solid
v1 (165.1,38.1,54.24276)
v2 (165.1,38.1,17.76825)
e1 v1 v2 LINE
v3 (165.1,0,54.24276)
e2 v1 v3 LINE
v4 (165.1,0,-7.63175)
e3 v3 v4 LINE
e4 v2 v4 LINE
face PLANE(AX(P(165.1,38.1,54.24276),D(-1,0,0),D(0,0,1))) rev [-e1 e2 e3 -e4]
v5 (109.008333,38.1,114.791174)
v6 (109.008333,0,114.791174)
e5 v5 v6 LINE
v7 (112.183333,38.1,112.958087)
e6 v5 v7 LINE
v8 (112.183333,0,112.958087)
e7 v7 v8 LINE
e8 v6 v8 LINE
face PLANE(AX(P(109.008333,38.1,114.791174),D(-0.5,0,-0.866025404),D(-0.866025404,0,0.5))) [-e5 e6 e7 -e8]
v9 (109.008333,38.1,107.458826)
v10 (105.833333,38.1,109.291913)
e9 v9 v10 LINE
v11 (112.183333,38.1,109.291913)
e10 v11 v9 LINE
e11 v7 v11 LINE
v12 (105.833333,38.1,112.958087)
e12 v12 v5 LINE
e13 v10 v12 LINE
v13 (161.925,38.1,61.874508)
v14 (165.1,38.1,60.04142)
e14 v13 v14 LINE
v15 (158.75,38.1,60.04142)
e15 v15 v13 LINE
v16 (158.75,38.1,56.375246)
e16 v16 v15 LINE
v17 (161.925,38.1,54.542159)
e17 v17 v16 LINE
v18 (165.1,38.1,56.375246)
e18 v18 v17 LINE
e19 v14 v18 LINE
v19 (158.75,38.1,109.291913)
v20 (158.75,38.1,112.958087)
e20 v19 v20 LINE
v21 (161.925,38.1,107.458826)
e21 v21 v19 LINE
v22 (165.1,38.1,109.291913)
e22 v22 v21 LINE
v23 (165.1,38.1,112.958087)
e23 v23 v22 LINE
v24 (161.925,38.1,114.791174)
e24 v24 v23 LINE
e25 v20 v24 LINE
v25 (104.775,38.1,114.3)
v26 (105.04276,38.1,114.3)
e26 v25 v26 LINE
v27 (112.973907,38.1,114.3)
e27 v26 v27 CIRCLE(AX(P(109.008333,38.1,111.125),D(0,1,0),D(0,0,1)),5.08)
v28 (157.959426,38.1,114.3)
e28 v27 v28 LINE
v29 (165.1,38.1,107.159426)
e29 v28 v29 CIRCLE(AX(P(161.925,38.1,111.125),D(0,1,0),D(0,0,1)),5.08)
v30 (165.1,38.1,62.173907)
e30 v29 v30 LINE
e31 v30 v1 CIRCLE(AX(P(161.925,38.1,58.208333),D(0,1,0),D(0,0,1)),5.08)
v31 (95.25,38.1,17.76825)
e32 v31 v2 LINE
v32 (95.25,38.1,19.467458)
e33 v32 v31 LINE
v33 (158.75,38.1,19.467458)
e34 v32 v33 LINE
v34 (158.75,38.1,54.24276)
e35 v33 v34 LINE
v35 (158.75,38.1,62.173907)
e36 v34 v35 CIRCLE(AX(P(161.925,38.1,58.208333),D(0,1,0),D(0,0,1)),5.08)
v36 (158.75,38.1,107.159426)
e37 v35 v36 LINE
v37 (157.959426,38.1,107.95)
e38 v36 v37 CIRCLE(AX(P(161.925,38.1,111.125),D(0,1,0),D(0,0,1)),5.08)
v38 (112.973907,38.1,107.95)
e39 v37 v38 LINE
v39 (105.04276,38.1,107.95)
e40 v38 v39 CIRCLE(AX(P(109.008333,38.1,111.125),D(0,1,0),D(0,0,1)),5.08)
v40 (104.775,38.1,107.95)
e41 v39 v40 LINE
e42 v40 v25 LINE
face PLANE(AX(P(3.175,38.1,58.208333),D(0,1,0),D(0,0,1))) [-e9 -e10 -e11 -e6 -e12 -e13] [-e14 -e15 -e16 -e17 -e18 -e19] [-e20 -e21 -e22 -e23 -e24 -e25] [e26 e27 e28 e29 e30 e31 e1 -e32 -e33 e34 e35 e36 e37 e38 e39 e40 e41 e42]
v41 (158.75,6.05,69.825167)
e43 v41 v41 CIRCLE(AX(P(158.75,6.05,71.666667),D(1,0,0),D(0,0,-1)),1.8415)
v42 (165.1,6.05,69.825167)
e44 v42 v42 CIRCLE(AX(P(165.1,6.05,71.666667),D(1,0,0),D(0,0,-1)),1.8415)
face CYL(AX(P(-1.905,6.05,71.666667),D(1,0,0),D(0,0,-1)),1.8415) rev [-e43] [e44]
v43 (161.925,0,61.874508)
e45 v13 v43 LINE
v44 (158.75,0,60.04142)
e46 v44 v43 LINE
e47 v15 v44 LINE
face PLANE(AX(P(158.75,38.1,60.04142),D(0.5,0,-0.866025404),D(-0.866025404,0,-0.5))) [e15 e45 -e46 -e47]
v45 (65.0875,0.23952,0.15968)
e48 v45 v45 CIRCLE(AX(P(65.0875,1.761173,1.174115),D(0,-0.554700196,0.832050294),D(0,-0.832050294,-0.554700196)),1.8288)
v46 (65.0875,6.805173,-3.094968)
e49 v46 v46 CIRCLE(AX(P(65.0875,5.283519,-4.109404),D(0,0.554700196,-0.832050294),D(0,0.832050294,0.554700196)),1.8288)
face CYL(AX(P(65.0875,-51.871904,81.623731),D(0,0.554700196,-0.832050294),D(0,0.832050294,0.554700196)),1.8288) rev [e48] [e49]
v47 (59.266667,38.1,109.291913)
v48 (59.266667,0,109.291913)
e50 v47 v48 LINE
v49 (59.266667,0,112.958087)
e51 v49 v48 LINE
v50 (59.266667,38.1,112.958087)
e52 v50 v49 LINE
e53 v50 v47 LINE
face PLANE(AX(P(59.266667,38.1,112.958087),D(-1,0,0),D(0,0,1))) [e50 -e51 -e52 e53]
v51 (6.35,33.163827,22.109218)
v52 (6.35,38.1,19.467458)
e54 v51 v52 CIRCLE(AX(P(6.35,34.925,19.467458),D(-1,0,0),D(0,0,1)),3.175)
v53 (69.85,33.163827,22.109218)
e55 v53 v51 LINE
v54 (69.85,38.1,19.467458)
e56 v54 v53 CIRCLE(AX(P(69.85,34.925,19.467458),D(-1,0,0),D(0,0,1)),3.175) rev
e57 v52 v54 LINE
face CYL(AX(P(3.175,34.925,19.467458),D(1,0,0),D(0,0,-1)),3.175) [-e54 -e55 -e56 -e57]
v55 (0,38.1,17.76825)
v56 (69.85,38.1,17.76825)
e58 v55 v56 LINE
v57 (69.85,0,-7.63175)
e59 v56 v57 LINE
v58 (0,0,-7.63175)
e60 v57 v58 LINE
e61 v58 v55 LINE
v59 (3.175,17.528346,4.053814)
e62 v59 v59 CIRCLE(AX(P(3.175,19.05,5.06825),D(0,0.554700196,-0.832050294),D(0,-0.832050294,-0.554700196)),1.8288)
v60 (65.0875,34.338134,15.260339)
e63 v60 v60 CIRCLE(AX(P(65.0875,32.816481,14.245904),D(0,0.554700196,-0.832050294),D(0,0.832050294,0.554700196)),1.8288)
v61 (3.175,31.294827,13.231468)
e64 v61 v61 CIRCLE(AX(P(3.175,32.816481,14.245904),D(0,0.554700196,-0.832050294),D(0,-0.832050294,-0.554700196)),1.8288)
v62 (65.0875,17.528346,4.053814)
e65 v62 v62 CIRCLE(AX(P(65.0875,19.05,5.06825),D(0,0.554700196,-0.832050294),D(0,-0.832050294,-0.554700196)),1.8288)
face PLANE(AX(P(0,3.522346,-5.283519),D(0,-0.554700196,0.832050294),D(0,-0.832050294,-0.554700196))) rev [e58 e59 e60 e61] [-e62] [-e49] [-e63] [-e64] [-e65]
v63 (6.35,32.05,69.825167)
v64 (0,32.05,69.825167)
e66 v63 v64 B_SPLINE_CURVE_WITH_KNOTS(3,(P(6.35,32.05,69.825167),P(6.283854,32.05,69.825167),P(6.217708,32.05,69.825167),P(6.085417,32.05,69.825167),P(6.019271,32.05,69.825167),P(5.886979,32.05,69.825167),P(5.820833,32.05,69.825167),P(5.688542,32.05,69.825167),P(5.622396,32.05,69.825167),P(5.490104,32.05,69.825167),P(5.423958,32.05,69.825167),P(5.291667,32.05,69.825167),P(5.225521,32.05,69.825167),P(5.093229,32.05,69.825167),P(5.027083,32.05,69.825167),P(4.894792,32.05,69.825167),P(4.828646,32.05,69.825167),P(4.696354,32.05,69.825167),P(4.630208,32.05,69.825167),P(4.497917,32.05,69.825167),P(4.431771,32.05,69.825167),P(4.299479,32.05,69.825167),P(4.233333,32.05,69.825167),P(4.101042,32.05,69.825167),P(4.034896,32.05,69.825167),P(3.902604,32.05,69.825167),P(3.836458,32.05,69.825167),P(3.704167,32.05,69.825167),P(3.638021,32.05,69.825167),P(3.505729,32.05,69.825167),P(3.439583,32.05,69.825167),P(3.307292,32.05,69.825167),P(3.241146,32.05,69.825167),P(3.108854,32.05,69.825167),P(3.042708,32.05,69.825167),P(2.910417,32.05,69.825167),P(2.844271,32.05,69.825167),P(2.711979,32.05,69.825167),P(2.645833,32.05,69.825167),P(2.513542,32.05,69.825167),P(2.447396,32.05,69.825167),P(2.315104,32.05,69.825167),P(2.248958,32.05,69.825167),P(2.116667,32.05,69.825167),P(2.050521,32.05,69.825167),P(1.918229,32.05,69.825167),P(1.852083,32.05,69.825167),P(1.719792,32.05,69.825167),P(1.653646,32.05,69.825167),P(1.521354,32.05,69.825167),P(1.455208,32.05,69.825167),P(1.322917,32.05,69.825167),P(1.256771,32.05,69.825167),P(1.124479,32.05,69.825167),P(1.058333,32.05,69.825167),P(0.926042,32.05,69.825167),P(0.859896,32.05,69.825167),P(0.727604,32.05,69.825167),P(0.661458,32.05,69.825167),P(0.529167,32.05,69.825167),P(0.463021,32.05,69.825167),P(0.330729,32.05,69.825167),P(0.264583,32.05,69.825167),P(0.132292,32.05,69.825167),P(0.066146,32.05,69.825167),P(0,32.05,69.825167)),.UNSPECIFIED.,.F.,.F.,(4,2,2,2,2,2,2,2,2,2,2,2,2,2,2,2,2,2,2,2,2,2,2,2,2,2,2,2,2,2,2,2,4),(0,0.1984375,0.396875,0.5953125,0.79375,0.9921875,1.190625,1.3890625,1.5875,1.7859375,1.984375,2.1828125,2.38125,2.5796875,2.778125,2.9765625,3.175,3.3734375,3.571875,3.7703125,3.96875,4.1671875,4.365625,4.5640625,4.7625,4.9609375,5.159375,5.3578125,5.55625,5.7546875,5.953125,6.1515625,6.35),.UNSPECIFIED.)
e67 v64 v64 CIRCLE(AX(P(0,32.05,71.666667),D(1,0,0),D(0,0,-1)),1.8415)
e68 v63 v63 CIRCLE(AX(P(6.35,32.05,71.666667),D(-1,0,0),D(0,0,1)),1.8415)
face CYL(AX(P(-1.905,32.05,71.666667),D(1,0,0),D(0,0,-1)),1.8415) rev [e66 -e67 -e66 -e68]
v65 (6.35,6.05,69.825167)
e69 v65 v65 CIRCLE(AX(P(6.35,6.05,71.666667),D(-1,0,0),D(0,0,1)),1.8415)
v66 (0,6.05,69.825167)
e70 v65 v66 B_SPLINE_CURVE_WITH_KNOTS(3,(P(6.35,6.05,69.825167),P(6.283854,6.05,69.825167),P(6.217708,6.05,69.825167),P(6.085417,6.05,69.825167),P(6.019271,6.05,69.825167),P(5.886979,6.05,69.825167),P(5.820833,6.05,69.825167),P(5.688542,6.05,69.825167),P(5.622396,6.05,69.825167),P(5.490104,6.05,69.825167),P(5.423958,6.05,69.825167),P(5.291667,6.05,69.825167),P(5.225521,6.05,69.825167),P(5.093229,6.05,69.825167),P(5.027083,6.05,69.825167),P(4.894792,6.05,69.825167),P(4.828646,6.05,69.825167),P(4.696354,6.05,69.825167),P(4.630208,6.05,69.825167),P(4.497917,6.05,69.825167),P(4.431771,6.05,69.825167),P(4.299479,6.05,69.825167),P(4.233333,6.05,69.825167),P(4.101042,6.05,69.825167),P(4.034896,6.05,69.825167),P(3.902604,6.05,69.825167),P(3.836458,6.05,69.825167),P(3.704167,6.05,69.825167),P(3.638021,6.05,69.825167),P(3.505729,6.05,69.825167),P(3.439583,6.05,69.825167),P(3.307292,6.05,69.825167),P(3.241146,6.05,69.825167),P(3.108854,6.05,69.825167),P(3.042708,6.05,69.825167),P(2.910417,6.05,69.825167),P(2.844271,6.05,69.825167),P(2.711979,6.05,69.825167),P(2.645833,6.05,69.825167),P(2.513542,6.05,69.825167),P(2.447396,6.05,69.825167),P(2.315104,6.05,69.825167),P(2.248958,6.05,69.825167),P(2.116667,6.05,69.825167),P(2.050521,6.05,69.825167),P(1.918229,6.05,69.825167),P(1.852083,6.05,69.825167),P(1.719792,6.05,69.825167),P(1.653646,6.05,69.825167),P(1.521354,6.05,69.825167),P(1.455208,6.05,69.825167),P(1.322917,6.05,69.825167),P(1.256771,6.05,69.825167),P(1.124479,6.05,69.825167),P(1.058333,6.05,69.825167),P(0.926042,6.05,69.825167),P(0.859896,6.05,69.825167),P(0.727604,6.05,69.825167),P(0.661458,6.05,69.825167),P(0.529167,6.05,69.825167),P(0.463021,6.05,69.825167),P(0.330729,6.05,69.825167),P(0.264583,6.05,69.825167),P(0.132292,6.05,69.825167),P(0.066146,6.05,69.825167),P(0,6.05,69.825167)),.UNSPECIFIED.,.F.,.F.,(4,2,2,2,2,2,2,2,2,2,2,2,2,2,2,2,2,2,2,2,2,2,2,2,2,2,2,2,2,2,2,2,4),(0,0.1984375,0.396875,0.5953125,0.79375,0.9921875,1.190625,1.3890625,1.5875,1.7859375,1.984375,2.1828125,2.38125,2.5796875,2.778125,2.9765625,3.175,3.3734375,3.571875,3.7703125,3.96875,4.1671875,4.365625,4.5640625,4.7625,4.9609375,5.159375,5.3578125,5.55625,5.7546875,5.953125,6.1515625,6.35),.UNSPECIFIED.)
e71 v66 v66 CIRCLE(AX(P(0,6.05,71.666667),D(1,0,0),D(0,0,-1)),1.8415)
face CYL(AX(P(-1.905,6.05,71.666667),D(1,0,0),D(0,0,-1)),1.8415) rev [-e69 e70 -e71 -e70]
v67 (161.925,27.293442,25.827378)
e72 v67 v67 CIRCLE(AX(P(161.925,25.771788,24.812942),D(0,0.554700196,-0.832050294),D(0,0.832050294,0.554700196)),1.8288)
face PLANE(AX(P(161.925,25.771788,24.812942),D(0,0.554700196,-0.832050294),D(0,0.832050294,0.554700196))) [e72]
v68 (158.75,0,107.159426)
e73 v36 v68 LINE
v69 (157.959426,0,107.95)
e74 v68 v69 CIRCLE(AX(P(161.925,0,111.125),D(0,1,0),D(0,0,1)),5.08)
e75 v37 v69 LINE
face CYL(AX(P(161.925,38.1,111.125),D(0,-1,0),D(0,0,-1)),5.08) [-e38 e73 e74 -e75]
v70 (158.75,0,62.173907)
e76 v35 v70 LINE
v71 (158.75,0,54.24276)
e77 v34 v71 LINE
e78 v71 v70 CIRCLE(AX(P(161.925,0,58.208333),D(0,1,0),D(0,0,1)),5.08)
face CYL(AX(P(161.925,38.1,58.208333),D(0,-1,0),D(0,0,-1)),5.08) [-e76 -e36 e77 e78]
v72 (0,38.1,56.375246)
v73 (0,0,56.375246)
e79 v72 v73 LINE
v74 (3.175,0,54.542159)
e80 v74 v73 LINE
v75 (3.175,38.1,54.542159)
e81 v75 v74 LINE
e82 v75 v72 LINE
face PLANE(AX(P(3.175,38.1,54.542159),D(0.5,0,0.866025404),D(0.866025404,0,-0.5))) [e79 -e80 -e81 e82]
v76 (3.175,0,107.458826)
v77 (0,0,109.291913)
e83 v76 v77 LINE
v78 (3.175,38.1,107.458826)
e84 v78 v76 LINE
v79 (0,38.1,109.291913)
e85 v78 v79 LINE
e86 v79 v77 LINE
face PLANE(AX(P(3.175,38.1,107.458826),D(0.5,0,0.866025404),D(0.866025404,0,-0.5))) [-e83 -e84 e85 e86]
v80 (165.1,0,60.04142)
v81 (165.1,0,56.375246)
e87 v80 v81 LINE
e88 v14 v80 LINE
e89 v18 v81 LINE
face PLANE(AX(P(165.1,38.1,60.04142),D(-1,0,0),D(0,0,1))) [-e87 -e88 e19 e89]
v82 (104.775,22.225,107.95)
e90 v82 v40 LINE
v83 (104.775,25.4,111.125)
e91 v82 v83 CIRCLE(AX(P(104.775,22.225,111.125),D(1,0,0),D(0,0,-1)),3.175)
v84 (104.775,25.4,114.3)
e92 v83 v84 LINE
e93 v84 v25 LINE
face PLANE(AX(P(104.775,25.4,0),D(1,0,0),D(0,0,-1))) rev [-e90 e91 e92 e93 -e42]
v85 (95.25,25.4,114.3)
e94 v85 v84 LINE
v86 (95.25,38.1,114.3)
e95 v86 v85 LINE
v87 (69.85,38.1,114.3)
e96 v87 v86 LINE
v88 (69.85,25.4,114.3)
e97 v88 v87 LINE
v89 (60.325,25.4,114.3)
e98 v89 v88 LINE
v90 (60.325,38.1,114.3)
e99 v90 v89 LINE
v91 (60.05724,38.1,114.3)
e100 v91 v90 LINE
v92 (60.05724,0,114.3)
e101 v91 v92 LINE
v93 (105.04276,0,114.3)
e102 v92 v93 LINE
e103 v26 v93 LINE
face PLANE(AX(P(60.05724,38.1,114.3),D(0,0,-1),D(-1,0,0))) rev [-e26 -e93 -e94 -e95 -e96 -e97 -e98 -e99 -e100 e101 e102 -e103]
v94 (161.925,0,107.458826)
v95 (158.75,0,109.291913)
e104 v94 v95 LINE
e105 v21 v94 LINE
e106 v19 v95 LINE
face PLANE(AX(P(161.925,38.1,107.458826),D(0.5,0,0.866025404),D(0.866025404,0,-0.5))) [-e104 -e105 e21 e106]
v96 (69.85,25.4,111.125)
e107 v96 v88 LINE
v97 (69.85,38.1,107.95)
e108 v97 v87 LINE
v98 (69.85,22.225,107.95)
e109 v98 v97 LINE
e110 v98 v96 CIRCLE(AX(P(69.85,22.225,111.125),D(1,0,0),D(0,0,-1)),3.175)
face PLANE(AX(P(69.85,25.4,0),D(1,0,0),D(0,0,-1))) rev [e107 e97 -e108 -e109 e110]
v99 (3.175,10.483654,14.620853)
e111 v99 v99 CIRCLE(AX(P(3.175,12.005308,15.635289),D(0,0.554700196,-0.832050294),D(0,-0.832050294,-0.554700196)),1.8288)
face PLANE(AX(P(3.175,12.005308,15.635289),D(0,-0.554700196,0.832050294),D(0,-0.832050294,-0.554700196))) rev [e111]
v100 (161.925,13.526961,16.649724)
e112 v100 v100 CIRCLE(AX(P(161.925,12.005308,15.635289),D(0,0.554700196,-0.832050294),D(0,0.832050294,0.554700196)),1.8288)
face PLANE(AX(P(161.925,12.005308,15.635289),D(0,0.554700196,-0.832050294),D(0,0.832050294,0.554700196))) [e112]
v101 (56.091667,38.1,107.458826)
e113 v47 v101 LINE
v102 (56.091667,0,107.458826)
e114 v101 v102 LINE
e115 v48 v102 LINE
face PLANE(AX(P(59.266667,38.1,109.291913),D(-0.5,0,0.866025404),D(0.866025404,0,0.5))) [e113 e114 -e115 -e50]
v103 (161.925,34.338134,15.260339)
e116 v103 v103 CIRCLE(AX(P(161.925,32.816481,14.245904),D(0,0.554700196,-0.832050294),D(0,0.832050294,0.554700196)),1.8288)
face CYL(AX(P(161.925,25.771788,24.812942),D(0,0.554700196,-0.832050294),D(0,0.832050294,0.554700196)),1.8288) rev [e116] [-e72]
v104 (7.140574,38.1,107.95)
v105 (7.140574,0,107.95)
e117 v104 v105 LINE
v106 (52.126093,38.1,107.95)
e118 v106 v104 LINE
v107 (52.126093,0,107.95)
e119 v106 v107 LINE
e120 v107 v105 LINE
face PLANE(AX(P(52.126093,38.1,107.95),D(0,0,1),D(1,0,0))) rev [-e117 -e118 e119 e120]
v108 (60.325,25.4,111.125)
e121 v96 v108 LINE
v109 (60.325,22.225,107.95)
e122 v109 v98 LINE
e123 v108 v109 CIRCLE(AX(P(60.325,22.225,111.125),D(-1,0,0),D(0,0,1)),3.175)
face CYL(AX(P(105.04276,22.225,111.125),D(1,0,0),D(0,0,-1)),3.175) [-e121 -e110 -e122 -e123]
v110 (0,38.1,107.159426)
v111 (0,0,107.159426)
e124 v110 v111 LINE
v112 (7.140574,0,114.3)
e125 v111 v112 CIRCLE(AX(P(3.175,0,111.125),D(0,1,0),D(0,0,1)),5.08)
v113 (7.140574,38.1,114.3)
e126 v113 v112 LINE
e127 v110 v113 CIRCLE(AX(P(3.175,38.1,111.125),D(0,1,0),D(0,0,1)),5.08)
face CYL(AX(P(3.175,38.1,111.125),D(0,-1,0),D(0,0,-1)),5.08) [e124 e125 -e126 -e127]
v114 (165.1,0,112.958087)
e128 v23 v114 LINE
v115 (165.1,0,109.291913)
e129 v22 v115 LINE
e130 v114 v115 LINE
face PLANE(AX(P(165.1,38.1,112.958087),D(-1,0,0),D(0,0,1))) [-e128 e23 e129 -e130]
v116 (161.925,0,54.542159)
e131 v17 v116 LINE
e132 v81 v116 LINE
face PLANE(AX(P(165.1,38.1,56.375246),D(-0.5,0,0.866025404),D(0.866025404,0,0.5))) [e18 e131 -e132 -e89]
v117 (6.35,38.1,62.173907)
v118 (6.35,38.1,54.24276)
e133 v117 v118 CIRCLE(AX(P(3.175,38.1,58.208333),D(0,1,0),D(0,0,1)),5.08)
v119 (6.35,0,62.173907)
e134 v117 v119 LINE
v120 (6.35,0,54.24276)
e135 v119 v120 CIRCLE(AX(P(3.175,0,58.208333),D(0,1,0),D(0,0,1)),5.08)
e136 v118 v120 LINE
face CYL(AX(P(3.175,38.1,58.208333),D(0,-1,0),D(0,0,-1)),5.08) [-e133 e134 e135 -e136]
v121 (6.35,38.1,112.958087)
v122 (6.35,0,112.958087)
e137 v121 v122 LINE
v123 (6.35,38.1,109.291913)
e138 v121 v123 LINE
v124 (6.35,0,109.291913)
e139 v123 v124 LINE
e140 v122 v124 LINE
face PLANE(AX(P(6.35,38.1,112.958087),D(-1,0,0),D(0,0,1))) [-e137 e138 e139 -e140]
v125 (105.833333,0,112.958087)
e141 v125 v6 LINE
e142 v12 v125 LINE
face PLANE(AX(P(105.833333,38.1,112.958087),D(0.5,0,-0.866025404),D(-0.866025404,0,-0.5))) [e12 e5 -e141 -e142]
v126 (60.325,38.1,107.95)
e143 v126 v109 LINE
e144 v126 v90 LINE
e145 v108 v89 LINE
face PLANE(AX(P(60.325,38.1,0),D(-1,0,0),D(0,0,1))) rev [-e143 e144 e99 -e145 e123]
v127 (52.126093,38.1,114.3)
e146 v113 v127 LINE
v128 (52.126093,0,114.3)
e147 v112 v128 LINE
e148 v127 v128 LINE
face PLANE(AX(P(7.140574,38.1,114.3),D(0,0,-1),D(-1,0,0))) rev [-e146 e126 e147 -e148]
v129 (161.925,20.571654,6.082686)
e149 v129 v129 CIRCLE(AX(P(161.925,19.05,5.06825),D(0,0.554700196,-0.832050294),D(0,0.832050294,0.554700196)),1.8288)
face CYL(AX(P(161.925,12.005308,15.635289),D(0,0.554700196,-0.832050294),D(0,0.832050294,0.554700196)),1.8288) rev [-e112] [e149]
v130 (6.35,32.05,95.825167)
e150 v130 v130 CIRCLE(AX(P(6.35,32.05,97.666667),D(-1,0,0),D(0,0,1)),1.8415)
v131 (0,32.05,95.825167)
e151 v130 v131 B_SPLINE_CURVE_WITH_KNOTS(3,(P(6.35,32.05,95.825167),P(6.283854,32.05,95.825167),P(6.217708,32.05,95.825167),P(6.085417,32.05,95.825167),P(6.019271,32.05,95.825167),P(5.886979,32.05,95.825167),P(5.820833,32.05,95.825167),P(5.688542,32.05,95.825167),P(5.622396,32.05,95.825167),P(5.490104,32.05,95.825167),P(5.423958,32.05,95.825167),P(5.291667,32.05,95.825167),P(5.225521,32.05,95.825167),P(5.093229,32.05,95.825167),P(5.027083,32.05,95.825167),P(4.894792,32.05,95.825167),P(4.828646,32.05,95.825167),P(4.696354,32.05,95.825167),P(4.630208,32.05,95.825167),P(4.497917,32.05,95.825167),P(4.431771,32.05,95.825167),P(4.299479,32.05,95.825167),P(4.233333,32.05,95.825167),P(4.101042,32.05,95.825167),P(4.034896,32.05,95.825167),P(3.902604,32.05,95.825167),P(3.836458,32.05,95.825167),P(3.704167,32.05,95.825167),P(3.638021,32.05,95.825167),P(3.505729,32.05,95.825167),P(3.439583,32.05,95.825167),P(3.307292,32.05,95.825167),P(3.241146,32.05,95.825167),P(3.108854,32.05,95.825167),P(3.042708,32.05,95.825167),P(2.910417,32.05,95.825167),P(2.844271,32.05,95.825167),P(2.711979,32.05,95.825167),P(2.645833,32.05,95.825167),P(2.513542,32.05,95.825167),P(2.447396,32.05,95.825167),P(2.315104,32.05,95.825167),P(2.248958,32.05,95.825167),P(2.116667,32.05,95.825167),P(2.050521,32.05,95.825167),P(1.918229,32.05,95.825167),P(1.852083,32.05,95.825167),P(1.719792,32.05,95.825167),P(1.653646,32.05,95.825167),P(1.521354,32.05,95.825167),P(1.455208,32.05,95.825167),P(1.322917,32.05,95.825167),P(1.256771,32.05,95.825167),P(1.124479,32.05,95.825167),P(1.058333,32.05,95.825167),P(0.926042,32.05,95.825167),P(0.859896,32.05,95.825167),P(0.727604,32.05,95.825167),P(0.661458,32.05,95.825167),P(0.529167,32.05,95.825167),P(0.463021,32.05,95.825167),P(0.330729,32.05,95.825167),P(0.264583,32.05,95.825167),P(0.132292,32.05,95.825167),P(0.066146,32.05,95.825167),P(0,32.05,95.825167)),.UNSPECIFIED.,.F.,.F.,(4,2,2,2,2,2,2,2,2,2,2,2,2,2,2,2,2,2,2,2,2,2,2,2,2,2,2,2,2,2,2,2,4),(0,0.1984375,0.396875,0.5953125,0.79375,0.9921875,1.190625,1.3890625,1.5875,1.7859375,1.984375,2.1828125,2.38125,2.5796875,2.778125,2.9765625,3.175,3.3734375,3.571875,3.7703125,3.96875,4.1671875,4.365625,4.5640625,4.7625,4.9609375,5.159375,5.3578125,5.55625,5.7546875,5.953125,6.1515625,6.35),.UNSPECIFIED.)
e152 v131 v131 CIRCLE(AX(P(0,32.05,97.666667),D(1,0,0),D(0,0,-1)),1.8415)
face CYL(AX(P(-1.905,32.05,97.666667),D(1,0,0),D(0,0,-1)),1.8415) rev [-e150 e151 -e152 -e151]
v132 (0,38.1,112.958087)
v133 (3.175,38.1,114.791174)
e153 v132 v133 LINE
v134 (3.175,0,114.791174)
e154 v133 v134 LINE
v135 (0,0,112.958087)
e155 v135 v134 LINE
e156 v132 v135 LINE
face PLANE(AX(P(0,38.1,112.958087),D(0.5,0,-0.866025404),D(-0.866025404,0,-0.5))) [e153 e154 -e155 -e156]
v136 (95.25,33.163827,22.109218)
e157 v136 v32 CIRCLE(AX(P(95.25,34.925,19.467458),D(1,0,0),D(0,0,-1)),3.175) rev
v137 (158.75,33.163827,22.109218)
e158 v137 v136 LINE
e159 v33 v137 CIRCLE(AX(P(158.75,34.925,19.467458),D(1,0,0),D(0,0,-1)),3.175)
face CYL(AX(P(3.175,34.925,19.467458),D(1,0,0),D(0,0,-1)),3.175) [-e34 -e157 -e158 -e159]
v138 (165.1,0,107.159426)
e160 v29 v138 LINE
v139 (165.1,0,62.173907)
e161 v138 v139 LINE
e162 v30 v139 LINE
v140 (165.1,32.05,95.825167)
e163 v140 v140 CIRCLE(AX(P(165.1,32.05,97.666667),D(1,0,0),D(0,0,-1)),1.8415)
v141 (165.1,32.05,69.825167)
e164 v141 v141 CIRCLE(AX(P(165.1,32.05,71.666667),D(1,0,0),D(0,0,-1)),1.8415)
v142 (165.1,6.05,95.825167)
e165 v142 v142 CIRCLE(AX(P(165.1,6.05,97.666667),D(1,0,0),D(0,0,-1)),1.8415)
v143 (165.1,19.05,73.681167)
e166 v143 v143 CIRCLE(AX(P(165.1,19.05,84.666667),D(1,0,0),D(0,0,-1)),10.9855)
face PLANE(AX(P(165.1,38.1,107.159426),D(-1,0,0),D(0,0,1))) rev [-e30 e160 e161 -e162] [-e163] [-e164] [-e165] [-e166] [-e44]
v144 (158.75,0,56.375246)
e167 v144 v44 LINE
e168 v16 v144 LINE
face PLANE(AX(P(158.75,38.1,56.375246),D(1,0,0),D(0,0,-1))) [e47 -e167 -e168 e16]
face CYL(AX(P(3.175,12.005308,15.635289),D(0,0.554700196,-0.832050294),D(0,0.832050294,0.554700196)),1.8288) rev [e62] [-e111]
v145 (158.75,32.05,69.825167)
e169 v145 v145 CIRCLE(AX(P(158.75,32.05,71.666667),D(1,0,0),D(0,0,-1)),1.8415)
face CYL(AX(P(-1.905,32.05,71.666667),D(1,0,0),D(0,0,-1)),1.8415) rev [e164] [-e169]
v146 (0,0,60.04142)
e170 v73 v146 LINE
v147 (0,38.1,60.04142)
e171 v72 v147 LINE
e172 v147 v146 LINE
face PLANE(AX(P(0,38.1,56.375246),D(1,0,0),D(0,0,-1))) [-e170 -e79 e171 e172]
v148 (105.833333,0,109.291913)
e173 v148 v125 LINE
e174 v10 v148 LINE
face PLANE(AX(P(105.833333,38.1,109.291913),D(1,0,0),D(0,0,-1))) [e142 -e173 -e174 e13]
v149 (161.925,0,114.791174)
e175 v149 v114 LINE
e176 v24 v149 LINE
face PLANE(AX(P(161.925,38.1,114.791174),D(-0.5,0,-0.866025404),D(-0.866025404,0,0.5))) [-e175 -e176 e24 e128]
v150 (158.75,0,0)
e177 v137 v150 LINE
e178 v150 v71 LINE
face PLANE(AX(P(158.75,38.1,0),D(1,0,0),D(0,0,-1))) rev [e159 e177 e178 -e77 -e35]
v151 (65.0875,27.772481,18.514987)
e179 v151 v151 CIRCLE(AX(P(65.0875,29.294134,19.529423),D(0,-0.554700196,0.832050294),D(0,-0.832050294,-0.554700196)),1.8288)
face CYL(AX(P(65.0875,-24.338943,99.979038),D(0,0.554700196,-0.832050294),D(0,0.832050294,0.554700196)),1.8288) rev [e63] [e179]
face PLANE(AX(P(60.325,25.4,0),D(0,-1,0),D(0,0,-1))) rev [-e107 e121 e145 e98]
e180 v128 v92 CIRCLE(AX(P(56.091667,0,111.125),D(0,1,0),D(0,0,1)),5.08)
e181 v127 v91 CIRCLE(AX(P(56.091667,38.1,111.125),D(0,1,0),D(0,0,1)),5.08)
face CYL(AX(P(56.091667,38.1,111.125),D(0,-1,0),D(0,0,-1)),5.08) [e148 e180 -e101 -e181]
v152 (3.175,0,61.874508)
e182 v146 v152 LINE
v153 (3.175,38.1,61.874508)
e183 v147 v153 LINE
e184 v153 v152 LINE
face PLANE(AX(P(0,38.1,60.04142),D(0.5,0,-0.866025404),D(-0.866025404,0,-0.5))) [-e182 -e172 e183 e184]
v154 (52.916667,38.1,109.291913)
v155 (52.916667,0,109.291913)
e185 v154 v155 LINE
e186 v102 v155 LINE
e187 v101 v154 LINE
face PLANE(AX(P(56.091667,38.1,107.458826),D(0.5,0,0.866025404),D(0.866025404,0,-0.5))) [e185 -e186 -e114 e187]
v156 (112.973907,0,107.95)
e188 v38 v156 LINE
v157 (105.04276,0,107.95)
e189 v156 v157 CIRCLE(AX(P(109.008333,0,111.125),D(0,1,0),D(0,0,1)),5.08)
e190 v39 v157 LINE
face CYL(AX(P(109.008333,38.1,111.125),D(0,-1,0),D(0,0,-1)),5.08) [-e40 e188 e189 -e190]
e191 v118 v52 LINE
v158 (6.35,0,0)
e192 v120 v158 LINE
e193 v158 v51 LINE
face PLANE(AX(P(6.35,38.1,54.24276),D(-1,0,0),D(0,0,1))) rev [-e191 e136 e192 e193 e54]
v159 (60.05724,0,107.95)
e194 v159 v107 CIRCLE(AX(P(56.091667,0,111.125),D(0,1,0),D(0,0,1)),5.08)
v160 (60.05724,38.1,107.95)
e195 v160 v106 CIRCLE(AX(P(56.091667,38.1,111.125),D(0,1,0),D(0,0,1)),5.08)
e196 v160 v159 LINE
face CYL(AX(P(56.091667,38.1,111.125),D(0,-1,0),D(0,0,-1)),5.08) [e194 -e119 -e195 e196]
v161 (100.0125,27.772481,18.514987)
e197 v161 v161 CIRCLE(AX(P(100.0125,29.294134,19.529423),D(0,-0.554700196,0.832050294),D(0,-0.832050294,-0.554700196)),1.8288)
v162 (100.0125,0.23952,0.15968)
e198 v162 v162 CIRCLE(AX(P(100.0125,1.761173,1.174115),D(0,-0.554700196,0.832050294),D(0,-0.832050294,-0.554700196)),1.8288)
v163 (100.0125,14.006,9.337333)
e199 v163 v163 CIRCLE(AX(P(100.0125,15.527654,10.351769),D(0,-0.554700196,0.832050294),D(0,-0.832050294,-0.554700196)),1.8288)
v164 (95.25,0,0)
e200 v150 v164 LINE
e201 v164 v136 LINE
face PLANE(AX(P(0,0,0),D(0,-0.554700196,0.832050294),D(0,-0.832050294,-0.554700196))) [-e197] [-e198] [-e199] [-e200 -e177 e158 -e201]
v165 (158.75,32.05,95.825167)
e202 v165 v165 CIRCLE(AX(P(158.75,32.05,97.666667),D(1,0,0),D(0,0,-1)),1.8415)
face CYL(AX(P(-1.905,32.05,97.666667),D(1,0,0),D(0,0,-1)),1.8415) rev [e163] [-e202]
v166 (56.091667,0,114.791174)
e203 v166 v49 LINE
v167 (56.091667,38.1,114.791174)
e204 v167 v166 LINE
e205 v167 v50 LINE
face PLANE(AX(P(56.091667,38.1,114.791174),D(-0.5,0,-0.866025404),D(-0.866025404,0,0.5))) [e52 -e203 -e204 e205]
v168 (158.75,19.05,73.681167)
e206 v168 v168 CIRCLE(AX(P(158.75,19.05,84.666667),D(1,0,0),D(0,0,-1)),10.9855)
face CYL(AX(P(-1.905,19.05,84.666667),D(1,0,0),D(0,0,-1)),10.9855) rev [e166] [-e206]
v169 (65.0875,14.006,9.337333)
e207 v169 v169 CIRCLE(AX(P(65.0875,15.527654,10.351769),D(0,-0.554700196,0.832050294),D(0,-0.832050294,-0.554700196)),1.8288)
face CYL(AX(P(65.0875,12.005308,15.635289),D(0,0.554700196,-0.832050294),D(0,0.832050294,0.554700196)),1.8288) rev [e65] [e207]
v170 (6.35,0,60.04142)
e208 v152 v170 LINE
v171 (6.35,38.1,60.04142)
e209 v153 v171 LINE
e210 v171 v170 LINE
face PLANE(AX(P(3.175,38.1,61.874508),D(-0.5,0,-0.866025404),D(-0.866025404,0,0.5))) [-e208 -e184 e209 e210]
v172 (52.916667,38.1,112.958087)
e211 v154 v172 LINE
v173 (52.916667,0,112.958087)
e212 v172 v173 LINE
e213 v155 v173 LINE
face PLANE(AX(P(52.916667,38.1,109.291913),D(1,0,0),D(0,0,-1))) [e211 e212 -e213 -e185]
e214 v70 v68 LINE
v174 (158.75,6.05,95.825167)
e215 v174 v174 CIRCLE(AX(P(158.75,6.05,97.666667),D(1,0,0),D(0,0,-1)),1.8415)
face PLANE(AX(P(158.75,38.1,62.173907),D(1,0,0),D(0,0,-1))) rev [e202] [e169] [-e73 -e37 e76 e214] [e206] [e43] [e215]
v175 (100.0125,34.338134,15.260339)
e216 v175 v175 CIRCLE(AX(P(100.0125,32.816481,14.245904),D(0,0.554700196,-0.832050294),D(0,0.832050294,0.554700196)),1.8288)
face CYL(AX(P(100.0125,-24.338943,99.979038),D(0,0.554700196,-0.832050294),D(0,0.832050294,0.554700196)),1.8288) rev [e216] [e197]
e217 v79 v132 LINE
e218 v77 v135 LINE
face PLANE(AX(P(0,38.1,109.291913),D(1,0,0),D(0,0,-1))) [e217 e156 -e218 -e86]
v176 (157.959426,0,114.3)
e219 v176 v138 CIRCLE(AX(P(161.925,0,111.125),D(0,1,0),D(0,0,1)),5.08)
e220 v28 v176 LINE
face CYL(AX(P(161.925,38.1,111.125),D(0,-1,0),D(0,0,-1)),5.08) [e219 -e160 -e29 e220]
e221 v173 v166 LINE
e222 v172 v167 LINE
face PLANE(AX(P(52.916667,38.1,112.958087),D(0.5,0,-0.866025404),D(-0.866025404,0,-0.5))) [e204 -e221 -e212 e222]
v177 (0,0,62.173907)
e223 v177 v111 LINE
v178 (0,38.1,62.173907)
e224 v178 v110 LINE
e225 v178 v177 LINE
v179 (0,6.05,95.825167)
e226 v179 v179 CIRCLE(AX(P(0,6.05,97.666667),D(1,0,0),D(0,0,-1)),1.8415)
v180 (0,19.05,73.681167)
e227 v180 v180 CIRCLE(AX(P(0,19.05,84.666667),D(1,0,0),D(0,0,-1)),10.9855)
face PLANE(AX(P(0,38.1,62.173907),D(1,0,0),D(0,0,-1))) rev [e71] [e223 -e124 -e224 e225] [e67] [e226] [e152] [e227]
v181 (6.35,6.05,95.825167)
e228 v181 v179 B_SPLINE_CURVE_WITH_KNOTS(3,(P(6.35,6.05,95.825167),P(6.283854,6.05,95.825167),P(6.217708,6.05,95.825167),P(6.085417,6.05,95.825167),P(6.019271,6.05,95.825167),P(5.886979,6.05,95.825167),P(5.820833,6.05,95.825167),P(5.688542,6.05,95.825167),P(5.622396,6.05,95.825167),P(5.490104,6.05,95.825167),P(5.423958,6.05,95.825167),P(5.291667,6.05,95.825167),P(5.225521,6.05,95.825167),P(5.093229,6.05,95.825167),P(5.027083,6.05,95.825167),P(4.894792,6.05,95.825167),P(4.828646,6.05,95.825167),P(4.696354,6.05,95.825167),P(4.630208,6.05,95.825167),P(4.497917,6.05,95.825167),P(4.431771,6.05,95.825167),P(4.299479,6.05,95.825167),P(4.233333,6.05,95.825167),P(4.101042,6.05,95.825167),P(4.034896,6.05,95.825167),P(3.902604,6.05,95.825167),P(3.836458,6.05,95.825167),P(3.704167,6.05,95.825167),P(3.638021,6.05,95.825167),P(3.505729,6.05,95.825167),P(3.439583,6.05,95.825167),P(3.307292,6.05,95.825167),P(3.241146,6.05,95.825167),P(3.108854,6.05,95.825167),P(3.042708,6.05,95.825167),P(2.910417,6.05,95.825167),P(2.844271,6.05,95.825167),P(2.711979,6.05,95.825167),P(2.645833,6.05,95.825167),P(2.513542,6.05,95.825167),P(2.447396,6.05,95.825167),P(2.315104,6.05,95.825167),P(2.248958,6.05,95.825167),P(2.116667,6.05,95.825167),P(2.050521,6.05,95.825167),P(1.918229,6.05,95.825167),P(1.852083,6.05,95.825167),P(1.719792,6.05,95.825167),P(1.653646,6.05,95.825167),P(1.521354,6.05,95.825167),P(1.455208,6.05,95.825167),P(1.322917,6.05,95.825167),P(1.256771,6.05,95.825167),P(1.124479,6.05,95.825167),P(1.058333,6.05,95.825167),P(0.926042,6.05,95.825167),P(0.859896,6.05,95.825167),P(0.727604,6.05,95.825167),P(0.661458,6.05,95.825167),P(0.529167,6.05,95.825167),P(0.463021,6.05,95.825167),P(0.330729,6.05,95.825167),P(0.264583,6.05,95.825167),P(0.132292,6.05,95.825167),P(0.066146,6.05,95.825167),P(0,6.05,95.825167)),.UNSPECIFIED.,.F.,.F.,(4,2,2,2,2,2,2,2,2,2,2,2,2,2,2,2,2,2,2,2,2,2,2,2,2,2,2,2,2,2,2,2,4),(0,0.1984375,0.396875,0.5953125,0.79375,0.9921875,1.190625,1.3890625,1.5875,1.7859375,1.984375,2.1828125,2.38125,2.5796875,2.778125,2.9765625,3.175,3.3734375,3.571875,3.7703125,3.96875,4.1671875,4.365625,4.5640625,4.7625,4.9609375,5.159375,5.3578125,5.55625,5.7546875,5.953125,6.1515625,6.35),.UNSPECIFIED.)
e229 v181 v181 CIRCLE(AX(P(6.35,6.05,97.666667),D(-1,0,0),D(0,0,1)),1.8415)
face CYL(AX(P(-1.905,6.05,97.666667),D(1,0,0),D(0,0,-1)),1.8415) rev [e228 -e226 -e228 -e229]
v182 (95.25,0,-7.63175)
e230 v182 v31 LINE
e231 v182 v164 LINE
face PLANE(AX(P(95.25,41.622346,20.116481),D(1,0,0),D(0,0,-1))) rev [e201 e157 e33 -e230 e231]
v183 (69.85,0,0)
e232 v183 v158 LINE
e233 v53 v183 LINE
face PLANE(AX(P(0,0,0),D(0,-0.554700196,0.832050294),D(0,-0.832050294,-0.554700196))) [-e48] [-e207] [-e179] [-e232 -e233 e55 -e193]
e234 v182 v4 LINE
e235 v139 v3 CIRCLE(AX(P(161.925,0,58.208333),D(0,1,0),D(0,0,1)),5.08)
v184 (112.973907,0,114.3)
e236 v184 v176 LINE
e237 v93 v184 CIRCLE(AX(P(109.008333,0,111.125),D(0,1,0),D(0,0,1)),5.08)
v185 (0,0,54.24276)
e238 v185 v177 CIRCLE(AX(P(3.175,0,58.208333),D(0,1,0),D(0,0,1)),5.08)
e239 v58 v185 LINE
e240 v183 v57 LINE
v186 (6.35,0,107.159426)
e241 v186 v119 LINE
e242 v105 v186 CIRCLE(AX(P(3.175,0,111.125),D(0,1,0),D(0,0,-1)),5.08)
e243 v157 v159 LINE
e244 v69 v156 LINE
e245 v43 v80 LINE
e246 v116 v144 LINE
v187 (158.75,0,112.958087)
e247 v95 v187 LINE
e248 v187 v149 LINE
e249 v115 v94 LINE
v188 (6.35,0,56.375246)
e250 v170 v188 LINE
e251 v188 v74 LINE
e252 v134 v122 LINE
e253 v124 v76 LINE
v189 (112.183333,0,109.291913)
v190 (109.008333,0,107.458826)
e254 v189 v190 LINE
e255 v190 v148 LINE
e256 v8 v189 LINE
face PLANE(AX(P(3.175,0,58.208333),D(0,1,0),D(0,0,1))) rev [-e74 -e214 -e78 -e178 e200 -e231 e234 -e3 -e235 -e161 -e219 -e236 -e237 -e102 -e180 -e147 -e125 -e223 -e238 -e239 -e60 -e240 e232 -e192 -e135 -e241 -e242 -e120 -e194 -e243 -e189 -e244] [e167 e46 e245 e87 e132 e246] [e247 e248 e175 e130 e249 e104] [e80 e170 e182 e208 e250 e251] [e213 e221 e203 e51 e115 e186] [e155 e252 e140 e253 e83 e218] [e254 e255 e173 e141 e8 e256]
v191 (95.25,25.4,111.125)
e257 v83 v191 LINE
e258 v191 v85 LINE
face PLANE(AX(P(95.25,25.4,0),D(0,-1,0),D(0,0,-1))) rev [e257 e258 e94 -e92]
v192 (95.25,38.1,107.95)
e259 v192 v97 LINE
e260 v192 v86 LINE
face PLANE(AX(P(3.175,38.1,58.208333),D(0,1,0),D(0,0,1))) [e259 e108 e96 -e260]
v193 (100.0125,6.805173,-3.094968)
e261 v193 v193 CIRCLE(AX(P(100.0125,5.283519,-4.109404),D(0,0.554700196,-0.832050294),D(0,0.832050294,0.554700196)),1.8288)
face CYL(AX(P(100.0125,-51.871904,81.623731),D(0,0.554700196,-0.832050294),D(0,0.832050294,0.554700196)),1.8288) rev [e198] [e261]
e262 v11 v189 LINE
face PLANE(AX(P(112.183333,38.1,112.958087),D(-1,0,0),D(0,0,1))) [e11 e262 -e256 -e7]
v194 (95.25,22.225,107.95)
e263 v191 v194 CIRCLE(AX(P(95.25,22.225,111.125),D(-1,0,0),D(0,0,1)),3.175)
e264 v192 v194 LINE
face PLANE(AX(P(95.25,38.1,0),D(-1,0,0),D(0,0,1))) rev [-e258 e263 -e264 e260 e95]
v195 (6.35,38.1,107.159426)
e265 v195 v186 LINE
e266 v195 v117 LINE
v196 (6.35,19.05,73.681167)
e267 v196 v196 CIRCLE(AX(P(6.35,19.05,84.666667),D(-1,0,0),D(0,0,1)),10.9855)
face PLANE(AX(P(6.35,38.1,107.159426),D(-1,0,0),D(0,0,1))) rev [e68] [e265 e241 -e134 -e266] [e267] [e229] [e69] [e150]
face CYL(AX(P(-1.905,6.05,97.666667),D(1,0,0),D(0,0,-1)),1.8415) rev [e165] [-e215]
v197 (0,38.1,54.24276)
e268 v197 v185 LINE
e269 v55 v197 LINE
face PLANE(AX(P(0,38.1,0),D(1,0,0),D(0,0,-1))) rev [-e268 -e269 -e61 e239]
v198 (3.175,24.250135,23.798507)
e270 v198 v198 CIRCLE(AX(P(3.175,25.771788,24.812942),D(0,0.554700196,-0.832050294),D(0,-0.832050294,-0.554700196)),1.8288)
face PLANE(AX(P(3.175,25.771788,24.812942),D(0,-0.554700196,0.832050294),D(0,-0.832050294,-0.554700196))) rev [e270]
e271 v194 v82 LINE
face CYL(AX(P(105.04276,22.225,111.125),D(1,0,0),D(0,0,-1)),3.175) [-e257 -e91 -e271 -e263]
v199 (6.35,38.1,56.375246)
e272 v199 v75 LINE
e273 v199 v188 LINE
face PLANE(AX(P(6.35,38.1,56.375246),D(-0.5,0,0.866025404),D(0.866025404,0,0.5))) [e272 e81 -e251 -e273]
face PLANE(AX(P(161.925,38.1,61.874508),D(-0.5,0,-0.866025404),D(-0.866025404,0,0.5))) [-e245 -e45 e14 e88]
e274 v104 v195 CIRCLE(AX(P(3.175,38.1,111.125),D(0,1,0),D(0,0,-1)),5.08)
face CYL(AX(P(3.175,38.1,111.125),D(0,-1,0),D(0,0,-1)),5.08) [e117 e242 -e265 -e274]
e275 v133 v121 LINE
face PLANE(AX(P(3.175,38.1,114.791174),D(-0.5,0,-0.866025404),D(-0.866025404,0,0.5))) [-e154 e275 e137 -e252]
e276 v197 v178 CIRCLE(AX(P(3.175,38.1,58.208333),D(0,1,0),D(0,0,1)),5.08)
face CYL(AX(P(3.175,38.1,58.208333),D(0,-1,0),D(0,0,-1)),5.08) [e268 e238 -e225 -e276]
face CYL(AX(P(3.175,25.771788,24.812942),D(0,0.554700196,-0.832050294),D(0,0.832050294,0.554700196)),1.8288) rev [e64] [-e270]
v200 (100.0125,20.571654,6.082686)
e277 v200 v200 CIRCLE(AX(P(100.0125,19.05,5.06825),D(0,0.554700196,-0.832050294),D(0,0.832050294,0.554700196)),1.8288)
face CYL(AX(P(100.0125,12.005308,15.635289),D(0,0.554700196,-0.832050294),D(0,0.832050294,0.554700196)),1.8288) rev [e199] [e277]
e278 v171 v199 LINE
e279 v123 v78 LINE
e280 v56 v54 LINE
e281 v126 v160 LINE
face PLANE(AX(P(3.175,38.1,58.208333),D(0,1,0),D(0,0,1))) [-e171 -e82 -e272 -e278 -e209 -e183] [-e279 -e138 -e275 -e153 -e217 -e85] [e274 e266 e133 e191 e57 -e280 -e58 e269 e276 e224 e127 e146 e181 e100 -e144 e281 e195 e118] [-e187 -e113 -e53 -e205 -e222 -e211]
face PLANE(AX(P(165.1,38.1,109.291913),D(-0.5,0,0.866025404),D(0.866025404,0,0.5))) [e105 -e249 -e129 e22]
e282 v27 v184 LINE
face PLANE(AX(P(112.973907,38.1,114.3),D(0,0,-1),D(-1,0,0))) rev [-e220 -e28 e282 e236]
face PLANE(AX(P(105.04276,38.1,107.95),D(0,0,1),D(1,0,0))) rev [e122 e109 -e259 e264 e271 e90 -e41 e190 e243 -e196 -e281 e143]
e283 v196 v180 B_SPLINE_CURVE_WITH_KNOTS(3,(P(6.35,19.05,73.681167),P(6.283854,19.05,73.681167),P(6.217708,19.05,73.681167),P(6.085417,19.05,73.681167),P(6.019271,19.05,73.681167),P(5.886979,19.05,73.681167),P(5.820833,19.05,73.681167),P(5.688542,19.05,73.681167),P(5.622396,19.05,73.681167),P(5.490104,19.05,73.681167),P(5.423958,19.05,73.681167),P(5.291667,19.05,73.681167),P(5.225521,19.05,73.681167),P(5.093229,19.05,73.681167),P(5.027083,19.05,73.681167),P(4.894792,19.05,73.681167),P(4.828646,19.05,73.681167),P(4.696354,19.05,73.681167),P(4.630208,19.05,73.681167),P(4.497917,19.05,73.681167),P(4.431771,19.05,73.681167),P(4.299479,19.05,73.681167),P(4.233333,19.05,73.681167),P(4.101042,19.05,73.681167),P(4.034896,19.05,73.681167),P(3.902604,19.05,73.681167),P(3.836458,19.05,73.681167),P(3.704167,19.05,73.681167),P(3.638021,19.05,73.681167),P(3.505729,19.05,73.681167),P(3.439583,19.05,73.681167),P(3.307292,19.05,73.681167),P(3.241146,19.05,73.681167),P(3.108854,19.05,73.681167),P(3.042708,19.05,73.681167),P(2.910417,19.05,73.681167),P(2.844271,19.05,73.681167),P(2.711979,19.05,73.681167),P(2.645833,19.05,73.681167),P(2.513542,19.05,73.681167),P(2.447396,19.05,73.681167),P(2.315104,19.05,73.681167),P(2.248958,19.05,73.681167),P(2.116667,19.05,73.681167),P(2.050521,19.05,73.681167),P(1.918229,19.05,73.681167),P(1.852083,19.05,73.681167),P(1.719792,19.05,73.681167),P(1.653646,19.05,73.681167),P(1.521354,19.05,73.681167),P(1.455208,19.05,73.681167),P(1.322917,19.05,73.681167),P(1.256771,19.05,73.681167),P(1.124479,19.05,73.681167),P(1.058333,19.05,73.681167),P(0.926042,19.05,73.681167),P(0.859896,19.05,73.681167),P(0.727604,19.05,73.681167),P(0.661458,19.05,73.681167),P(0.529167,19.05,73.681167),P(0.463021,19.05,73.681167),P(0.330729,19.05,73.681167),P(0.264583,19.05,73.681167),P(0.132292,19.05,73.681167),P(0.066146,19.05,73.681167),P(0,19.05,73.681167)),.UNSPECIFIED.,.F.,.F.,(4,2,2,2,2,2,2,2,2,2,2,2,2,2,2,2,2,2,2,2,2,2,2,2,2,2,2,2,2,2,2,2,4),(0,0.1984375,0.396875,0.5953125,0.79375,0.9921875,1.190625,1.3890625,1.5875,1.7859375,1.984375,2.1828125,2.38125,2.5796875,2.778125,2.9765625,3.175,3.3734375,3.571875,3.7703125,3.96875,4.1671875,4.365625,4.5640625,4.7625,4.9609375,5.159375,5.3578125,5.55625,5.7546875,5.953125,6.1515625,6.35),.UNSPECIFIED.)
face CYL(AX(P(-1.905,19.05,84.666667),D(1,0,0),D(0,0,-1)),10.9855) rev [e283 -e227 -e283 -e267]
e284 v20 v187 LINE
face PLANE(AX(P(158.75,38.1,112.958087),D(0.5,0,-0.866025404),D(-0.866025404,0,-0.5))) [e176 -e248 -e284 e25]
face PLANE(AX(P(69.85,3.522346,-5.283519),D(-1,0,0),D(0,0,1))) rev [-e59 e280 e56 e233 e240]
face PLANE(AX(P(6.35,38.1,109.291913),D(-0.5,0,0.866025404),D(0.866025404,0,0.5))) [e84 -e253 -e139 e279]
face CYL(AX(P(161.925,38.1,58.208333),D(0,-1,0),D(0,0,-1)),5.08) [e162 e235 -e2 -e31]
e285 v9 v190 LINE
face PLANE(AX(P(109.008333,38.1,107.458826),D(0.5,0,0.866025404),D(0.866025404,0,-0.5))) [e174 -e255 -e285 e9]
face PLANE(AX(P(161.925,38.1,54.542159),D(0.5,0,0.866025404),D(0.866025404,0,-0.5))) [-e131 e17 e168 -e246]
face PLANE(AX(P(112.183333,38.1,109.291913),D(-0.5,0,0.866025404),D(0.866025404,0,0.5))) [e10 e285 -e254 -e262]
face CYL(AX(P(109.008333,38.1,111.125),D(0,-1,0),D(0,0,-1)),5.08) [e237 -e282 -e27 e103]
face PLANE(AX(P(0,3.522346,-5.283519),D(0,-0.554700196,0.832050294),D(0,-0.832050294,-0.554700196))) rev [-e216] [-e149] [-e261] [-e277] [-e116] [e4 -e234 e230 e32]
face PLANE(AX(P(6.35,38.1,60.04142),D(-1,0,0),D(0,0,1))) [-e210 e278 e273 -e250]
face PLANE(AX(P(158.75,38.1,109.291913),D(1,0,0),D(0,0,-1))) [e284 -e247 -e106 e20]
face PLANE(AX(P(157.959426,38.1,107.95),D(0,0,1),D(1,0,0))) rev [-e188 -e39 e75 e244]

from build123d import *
from OCP.BRepFilletAPI import BRepFilletAPI_MakeChamfer

# Parameters (mm, degrees)
BOSS_EXTRUDE2_DEPTH     = 38.1
CHAMFER2_SIZE           = 38.1
CHAMFER2_SIZE_2         = 25.4
SKETCH6_W               = 9.525
SKETCH6_H               = 12.7
CUT_EXTRUDE3_DEPTH      = 206.929041238
SKETCH7_R               = 10.9855
SKETCH7_R_2             = 1.8415
CUT_EXTRUDE4_DEPTH      = 207.992468583
SKETCH8_W               = 69.85
SKETCH8_H               = 45.790501198
BOSS_EXTRUDE3_DEPTH     = 6.35
CUT_EXTRUDE5_DEPTH      = 208.669669805
CUT_EXTRUDE5_DEPTH_BACK = 208.669669805
BOSS_EXTRUDE4_DEPTH     = 69.85
BOSS_EXTRUDE5_DEPTH     = 69.85
SKETCH12_R              = 1.8288
CUT_EXTRUDE6_DEPTH      = 210.393754689
SKETCH13_R              = 1.8288
CUT_EXTRUDE7_DEPTH      = 12.7
FILLET1_R               = 3.175


with BuildPart() as part:
    # Sketch4 → Boss-Extrude2 (new body)
    with BuildSketch(Plane(origin=(0, 0, 0), x_dir=(1, 0, 0), z_dir=(0, 1, 0))):
        with BuildLine():
            Line((0, 0), (0, -54.242759604))
            ThreePointArc((0, -54.242759604), (-1.905, -58.208333333), (0, -62.173907062))
            Line((0, -62.173907062), (0, -107.159426271))
            ThreePointArc((0, -107.159426271), (-0.417102448, -114.717102448), (7.140573729, -114.3))
            Line((7.140573729, -114.3), (52.126092938, -114.3))
            ThreePointArc((52.126092938, -114.3), (56.091666667, -116.205), (60.057240396, -114.3))
            Line((60.057240396, -114.3), (105.042759604, -114.3))
            ThreePointArc((105.042759604, -114.3), (109.008333333, -116.205), (112.973907062, -114.3))
            Line((112.973907062, -114.3), (157.959426271, -114.3))
            ThreePointArc((157.959426271, -114.3), (165.517102448, -114.717102448), (165.1, -107.159426271))
            Line((165.1, -107.159426271), (165.1, -62.173907062))
            ThreePointArc((165.1, -62.173907062), (167.005, -58.208333333), (165.1, -54.242759604))
            Line((165.1, -54.242759604), (165.1, 0))
            Line((165.1, 0), (158.75, 0))
            Line((158.75, 0), (158.75, -54.242759604))
            ThreePointArc((158.75, -54.242759604), (156.845, -58.208333333), (158.75, -62.173907062))
            Line((158.75, -62.173907062), (158.75, -107.159426271))
            ThreePointArc((158.75, -107.159426271), (158.332897552, -107.532897552), (157.959426271, -107.95))
            Line((157.959426271, -107.95), (112.973907062, -107.95))
            ThreePointArc((112.973907062, -107.95), (109.008333333, -106.045), (105.042759604, -107.95))
            Line((105.042759604, -107.95), (60.057240396, -107.95))
            ThreePointArc((60.057240396, -107.95), (56.091666667, -106.045), (52.126092938, -107.95))
            Line((52.126092938, -107.95), (7.140573729, -107.95))
            ThreePointArc((7.140573729, -107.95), (6.767102448, -107.532897552), (6.35, -107.159426271))
            Line((6.35, -107.159426271), (6.35, -62.173907062))
            ThreePointArc((6.35, -62.173907062), (8.255, -58.208333333), (6.35, -54.242759604))
            Line((6.35, -54.242759604), (6.35, 0))
            Line((6.35, 0), (0, 0))
        make_face()
        Polygon((0, -56.375246229), (0, -60.041420438), (3.175, -61.874507543), (6.35, -60.041420438), (6.35, -56.375246229), (3.175, -54.542159124), align=None, mode=Mode.SUBTRACT)
        Polygon((3.175, -107.458825791), (0, -109.291912895), (0, -112.958087105), (3.175, -114.791174209), (6.35, -112.958087105), (6.35, -109.291912895), align=None, mode=Mode.SUBTRACT)
        Polygon((56.091666667, -107.458825791), (52.916666667, -109.291912895), (52.916666667, -112.958087105), (56.091666667, -114.791174209), (59.266666667, -112.958087105), (59.266666667, -109.291912895), align=None, mode=Mode.SUBTRACT)
        Polygon((109.008333333, -107.458825791), (105.833333333, -109.291912895), (105.833333333, -112.958087105), (109.008333333, -114.791174209), (112.183333333, -112.958087105), (112.183333333, -109.291912895), align=None, mode=Mode.SUBTRACT)
        Polygon((161.925, -107.458825791), (158.75, -109.291912895), (158.75, -112.958087105), (161.925, -114.791174209), (165.1, -112.958087105), (165.1, -109.291912895), align=None, mode=Mode.SUBTRACT)
        Polygon((161.925, -54.542159124), (158.75, -56.375246229), (158.75, -60.041420438), (161.925, -61.874507543), (165.1, -60.041420438), (165.1, -56.375246229), align=None, mode=Mode.SUBTRACT)
    extrude(amount=BOSS_EXTRUDE2_DEPTH)

    # Chamfer2
    chamfer2_edges_1 = [part.edges().sort_by_distance(p)[0] for p in [
        (161.925, 38.1, 0),
    ]]
    chamfer2_side_1 = [part.faces().sort_by_distance(p)[0] for p in [
        (161.925, 37.592, 0),
    ]]
    chamfer2_edges_2 = [part.edges().sort_by_distance(p)[0] for p in [
        (3.175, 38.1, 0),
    ]]
    chamfer2_side_2 = [part.faces().sort_by_distance(p)[0] for p in [
        (3.175, 37.592, 0),
    ]]
    chamfer2 = BRepFilletAPI_MakeChamfer(part.part.solid().wrapped)
    for e in chamfer2_edges_1:
        chamfer2.Add(CHAMFER2_SIZE - 0.0001, CHAMFER2_SIZE_2 - 0.0001, e.wrapped, chamfer2_side_1[0].wrapped)
    for e in chamfer2_edges_2:
        chamfer2.Add(CHAMFER2_SIZE - 0.0001, CHAMFER2_SIZE_2 - 0.0001, e.wrapped, chamfer2_side_2[0].wrapped)
    add(Compound.cast(chamfer2.Shape()), mode=Mode.REPLACE)  # a hair under: the kernel refuses the full size

    # Sketch6 → Cut-Extrude3 (cut, through all)
    with BuildSketch(Plane.XY.offset(114.3)):
        with Locations((65.0875, 31.75)):
            Rectangle(SKETCH6_W, SKETCH6_H)
        with Locations((100.0125, 31.75)):
            Rectangle(SKETCH6_W, SKETCH6_H)
    extrude(amount=-CUT_EXTRUDE3_DEPTH, mode=Mode.SUBTRACT)

    # Sketch7 → Cut-Extrude4 (cut, through all)
    with BuildSketch(Plane(origin=(165.1, 0, 0), x_dir=(0, 0, -1), z_dir=(1, 0, 0))):
        with Locations((-84.666666667, 19.05)):
            Circle(SKETCH7_R)
        with Locations((-71.666666667, 32.05)):
            Circle(SKETCH7_R_2)
        with Locations((-71.666666667, 6.05)):
            Circle(SKETCH7_R_2)
        with Locations((-97.666666667, 6.05)):
            Circle(SKETCH7_R_2)
        with Locations((-97.666666667, 32.05)):
            Circle(SKETCH7_R_2)
    extrude(amount=-CUT_EXTRUDE4_DEPTH, mode=Mode.SUBTRACT)

    # Sketch8 → Boss-Extrude3 (add)
    with BuildSketch(Plane(origin=(0, 0, 0), x_dir=(-1, 0, 0), z_dir=(0, 0.5547001962252279, -0.8320502943378446))):
        with Locations((-130.175, 22.895250599)):
            Rectangle(SKETCH8_W, SKETCH8_H)
        with Locations((-34.925, 22.895250599)):
            Rectangle(SKETCH8_W, SKETCH8_H)
    extrude(amount=BOSS_EXTRUDE3_DEPTH)

    # Sketch9 → Cut-Extrude5 (cut, two sides: drawn at the far end of the back side and taken through both)
    with BuildSketch(Plane(origin=(165.1, 0, 0), x_dir=(0, 0, -1), z_dir=(1, 0, 0)).offset(-CUT_EXTRUDE5_DEPTH_BACK)):
        Polygon((-25.4, 38.1), (-17.7682498, 38.1), (-20.116480631, 41.622346246), align=None)
    extrude(amount=CUT_EXTRUDE5_DEPTH + CUT_EXTRUDE5_DEPTH_BACK, mode=Mode.SUBTRACT)

    # Sketch10 → Boss-Extrude4 (add)
    with BuildSketch(Plane(origin=(165.1, 0, 0), x_dir=(0, 0, -1), z_dir=(1, 0, 0))):
        Polygon((0, 0), (7.6317502, 0), (5.283519369, 3.522346246), align=None)
    extrude(amount=-BOSS_EXTRUDE4_DEPTH)

    # Sketch11 → Boss-Extrude5 (add)
    with BuildSketch(Plane.ZY):
        Polygon((-5.283519369, 3.522346246), (-7.6317502, 0), (0, 0), align=None)
    extrude(amount=-BOSS_EXTRUDE5_DEPTH)

    # Sketch12 → Cut-Extrude6 (cut, through all)
    with BuildSketch(Plane(origin=(0, 3.522346246, -5.283519369), x_dir=(-1, 0, 0), z_dir=(0, 0.5547001962252279, -0.8320502943378446))):
        with Locations(Location((-65.0875, 35.207167865, 0), (0, 0, 90))):
            Circle(SKETCH12_R)
        with Locations(Location((-65.0875, 2.116666667, 0), (0, 0, 90))):
            Circle(SKETCH12_R)
        with Locations(Location((-100.0125, 35.207167865, 0), (0, 0, 90))):
            Circle(SKETCH12_R)
        with Locations(Location((-100.0125, 2.116666667, 0), (0, 0, 90))):
            Circle(SKETCH12_R)
    extrude(amount=-CUT_EXTRUDE6_DEPTH, mode=Mode.SUBTRACT)

    # Sketch13 → Cut-Extrude7 (cut)
    with BuildSketch(Plane(origin=(0, 3.522346246, -5.283519369), x_dir=(-1, 0, 0), z_dir=(0, 0.5547001962252279, -0.8320502943378446))):
        with Locations(Location((-161.925, 35.207167865, 0), (0, 0, 90))):
            Circle(SKETCH13_R)
        with Locations(Location((-161.925, 18.661917266, 0), (0, 0, 90))):
            Circle(SKETCH13_R)
        with Locations(Location((-100.0125, 18.661917266, 0), (0, 0, 90))):
            Circle(SKETCH13_R)
        with Locations(Location((-3.175, 18.661917266, 0), (0, 0, 270))):
            Circle(SKETCH13_R)
        with Locations(Location((-3.175, 35.207167865, 0), (0, 0, 270))):
            Circle(SKETCH13_R)
        with Locations(Location((-65.0875, 18.661917266, 0), (0, 0, 270))):
            Circle(SKETCH13_R)
    extrude(amount=-CUT_EXTRUDE7_DEPTH, mode=Mode.SUBTRACT)

    # Fillet1
    fillet1_edges = [part.edges().sort_by_distance(p)[0] for p in [
        (100.0125, 25.4, 107.95),
        (65.0875, 25.4, 107.95),
        (127, 38.1, 25.4),
        (38.1, 38.1, 25.4),
    ]]
    fillet(fillet1_edges, radius=FILLET1_R)


solid = part.part
